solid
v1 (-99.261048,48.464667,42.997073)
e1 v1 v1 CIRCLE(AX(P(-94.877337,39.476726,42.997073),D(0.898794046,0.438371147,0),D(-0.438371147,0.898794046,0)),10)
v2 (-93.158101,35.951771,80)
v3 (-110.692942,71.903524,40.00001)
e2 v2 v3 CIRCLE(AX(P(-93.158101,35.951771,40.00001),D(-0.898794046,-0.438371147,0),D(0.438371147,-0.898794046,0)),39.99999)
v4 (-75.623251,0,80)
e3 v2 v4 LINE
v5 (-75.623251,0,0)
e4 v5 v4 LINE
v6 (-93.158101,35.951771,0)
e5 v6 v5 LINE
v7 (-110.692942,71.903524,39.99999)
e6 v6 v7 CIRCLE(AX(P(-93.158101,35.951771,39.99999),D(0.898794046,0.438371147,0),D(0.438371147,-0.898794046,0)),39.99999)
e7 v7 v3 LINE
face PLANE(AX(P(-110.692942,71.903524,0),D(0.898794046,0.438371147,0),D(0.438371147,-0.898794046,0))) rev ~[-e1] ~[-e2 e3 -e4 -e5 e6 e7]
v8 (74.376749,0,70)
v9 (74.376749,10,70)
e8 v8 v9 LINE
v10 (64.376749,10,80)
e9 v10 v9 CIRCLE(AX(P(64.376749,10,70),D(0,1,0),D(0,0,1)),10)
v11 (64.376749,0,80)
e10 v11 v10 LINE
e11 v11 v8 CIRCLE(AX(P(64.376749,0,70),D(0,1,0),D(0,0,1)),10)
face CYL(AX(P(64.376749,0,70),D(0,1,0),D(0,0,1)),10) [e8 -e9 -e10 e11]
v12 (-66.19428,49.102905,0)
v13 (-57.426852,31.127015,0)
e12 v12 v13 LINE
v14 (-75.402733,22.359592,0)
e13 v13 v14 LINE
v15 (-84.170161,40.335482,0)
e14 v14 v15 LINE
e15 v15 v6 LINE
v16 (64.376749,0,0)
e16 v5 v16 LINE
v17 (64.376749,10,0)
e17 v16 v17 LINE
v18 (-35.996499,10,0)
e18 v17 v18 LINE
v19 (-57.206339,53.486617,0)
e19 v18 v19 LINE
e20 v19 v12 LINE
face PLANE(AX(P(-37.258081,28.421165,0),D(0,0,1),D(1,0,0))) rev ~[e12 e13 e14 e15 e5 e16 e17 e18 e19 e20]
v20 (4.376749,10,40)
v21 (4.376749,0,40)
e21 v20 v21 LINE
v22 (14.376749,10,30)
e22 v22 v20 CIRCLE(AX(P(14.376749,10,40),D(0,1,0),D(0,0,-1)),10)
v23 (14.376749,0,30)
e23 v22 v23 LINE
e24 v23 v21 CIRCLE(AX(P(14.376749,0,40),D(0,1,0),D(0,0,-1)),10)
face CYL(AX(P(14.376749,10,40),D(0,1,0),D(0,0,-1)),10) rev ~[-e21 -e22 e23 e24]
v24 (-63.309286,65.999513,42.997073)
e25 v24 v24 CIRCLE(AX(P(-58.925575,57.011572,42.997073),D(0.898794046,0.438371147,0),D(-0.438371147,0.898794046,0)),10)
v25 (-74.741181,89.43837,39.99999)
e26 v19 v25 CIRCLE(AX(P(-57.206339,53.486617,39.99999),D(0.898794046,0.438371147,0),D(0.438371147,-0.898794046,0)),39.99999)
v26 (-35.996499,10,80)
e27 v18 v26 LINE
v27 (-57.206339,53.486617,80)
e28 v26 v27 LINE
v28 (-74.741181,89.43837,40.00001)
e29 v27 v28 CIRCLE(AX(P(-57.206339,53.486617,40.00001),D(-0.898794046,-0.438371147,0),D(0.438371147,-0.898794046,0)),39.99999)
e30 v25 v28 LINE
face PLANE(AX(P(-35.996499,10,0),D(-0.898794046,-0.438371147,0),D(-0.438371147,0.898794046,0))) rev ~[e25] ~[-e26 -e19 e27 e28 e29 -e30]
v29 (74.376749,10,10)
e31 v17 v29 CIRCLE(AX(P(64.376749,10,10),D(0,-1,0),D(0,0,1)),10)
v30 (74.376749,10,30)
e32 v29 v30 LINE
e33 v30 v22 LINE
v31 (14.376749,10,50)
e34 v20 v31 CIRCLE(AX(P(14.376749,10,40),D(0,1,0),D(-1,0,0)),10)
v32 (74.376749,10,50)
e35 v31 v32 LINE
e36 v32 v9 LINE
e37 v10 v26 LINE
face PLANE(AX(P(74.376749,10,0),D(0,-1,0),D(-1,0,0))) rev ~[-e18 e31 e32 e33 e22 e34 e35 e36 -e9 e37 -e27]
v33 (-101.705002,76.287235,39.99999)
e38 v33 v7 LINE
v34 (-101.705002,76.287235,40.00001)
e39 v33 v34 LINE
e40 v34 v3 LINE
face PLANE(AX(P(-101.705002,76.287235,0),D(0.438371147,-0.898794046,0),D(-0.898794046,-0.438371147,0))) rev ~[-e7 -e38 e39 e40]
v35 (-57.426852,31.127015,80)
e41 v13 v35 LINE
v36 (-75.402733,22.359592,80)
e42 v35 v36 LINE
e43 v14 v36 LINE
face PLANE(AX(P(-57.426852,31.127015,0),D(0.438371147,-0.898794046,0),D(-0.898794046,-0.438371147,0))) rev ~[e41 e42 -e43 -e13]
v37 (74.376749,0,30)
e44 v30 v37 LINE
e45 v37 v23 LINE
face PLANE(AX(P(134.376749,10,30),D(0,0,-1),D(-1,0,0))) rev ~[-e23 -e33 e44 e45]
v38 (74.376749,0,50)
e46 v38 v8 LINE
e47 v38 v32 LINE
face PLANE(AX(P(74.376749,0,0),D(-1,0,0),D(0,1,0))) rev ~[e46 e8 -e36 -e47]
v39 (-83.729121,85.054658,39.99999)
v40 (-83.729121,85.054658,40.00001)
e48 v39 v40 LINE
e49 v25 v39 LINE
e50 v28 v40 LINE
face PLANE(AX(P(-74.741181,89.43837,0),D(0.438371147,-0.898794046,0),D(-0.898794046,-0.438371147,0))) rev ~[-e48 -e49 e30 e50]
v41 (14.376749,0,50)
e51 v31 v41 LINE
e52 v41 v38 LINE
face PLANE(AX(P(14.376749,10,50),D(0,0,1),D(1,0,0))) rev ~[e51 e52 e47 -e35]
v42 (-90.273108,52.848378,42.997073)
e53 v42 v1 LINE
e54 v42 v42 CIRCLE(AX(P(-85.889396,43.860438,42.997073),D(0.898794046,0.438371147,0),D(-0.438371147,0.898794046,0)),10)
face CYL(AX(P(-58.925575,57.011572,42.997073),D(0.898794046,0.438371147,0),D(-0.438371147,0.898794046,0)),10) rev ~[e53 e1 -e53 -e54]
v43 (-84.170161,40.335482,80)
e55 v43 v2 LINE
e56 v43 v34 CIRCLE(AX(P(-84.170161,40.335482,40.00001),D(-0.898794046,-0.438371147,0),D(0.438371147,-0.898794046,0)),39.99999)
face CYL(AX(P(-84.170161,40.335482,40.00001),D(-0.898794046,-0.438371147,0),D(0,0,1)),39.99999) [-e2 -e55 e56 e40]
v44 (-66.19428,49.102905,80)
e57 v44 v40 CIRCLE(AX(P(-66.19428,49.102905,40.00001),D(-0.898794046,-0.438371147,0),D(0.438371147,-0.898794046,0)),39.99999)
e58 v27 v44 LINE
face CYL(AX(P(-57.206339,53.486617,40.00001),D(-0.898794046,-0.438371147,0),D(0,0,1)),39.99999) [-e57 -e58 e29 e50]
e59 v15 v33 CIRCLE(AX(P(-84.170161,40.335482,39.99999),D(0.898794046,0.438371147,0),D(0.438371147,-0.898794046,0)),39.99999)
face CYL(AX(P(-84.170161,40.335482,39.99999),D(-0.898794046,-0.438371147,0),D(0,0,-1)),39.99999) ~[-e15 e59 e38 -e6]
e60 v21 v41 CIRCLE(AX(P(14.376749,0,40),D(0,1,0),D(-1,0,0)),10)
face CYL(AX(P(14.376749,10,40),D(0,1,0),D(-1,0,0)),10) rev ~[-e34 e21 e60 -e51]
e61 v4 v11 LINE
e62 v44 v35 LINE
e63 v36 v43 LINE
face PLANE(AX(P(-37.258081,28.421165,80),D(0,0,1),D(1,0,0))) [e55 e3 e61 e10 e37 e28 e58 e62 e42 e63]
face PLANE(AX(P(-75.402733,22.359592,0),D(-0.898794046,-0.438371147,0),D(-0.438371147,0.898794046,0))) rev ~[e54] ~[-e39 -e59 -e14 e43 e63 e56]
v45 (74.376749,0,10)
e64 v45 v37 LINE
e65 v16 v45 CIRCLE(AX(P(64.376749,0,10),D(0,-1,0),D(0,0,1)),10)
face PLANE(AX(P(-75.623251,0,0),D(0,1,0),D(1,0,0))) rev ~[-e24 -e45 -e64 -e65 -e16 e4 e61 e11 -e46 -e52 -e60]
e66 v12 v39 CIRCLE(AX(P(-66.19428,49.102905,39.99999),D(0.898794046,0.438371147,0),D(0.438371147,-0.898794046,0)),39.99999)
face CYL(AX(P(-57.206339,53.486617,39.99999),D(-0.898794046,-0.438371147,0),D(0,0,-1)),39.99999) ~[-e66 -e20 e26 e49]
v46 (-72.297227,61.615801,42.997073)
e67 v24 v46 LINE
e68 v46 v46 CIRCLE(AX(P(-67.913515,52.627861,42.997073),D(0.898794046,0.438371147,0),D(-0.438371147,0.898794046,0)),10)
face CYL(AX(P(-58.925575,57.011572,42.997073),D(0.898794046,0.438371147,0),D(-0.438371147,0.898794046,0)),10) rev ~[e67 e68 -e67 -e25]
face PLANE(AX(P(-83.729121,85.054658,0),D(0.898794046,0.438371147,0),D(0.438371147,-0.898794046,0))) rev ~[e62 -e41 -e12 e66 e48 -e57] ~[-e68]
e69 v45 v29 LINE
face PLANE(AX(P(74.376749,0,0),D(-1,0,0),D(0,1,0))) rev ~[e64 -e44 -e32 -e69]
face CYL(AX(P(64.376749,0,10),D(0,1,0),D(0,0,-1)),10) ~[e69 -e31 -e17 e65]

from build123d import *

# Parameters (mm, degrees)
F1_DEPTH = 80
F3_DEPTH = 25
F4_R     = 39.99999
F6_R     = 10
F7_DEPTH = 101.1
F8_R     = 10


# Not quite as in the source:
# - a fillet or chamfer is up to 0.001 mm smaller than in the source, because OpenCascade refuses the exact size


with BuildPart() as f1:
    # F0 (on Top) → F1 (new body)
    with BuildSketch(Plane.XY):
        Polygon((-75.6232507176, 0), (74.3767492824, 0), (74.3767492824, 10), (-35.9964989842, 10), (-74.7411806087, 89.4383695755), (-83.7291210717, 85.0546581076), (-57.4268522644, 31.1270153297), (-75.4027331904, 22.3595923939), (-101.7050019977, 76.2872351718), (-110.6929424607, 71.9035237039), align=None)
    extrude(amount=F1_DEPTH)

    # F2 (on face) → F3 (cut)
    with BuildSketch(Plane(origin=(0, 10, 0), x_dir=(-1, 0, 0), z_dir=(0, 1, 0))):
        with BuildLine():
            ThreePointArc((-14.3767492824, 50), (-24.3767492824, 40), (-14.3767492824, 30))
            Line((-14.3767492824, 30), (-14.3767492824, 50))
        make_face()
        with BuildLine():
            Line((-134.3767492824, 30), (-14.3767492824, 30))
            ThreePointArc((-14.3767492824, 30), (-24.3767492824, 40), (-14.3767492824, 50))
            Line((-14.3767492824, 50), (-134.3767492824, 50))
            Line((-134.3767492824, 50), (-134.3767492824, 30))
        make_face()
        with BuildLine():
            Line((-14.3767492824, 50), (-14.3767492824, 30))
            ThreePointArc((-14.3767492824, 30), (-7.3056814706, 32.9289321881), (-4.3767492824, 40))
            ThreePointArc((-4.3767492824, 40), (-7.3056814706, 47.0710678119), (-14.3767492824, 50))
        make_face()
    extrude(amount=-F3_DEPTH, mode=Mode.SUBTRACT)

    # F4 (radius 40 in the source; OpenCascade refuses exactly that, so slightly less here)
    f4_edges = [f1.edges().sort_by_distance(p)[0] for p in [
        (-79.235151, 87.246514, 80),
        (-106.198972, 74.095379, 80),
        (-106.198972, 74.095379, 0),
        (-79.235151, 87.246514, 0),
    ]]
    fillet(f4_edges, radius=F4_R)

    # F6 (on face) → F7 (cut)
    with BuildSketch(Plane(origin=(-25.1390245597, -12.2611215225, 0), x_dir=(-0.4383711468, 0.8987940463, 0), z_dir=(0.8987940463, 0.4383711468, 0))):
        with Locations((77.0729333162, 42.9970733821)):
            Circle(F6_R)
    extrude(amount=-F7_DEPTH, mode=Mode.SUBTRACT)

    # F8
    f8_edges = [f1.edges().sort_by_distance(p)[0] for p in [
        (74.376749, 5, 80),
        (74.376749, 5, 0),
    ]]
    fillet(f8_edges, radius=F8_R)


solid = f1.part
